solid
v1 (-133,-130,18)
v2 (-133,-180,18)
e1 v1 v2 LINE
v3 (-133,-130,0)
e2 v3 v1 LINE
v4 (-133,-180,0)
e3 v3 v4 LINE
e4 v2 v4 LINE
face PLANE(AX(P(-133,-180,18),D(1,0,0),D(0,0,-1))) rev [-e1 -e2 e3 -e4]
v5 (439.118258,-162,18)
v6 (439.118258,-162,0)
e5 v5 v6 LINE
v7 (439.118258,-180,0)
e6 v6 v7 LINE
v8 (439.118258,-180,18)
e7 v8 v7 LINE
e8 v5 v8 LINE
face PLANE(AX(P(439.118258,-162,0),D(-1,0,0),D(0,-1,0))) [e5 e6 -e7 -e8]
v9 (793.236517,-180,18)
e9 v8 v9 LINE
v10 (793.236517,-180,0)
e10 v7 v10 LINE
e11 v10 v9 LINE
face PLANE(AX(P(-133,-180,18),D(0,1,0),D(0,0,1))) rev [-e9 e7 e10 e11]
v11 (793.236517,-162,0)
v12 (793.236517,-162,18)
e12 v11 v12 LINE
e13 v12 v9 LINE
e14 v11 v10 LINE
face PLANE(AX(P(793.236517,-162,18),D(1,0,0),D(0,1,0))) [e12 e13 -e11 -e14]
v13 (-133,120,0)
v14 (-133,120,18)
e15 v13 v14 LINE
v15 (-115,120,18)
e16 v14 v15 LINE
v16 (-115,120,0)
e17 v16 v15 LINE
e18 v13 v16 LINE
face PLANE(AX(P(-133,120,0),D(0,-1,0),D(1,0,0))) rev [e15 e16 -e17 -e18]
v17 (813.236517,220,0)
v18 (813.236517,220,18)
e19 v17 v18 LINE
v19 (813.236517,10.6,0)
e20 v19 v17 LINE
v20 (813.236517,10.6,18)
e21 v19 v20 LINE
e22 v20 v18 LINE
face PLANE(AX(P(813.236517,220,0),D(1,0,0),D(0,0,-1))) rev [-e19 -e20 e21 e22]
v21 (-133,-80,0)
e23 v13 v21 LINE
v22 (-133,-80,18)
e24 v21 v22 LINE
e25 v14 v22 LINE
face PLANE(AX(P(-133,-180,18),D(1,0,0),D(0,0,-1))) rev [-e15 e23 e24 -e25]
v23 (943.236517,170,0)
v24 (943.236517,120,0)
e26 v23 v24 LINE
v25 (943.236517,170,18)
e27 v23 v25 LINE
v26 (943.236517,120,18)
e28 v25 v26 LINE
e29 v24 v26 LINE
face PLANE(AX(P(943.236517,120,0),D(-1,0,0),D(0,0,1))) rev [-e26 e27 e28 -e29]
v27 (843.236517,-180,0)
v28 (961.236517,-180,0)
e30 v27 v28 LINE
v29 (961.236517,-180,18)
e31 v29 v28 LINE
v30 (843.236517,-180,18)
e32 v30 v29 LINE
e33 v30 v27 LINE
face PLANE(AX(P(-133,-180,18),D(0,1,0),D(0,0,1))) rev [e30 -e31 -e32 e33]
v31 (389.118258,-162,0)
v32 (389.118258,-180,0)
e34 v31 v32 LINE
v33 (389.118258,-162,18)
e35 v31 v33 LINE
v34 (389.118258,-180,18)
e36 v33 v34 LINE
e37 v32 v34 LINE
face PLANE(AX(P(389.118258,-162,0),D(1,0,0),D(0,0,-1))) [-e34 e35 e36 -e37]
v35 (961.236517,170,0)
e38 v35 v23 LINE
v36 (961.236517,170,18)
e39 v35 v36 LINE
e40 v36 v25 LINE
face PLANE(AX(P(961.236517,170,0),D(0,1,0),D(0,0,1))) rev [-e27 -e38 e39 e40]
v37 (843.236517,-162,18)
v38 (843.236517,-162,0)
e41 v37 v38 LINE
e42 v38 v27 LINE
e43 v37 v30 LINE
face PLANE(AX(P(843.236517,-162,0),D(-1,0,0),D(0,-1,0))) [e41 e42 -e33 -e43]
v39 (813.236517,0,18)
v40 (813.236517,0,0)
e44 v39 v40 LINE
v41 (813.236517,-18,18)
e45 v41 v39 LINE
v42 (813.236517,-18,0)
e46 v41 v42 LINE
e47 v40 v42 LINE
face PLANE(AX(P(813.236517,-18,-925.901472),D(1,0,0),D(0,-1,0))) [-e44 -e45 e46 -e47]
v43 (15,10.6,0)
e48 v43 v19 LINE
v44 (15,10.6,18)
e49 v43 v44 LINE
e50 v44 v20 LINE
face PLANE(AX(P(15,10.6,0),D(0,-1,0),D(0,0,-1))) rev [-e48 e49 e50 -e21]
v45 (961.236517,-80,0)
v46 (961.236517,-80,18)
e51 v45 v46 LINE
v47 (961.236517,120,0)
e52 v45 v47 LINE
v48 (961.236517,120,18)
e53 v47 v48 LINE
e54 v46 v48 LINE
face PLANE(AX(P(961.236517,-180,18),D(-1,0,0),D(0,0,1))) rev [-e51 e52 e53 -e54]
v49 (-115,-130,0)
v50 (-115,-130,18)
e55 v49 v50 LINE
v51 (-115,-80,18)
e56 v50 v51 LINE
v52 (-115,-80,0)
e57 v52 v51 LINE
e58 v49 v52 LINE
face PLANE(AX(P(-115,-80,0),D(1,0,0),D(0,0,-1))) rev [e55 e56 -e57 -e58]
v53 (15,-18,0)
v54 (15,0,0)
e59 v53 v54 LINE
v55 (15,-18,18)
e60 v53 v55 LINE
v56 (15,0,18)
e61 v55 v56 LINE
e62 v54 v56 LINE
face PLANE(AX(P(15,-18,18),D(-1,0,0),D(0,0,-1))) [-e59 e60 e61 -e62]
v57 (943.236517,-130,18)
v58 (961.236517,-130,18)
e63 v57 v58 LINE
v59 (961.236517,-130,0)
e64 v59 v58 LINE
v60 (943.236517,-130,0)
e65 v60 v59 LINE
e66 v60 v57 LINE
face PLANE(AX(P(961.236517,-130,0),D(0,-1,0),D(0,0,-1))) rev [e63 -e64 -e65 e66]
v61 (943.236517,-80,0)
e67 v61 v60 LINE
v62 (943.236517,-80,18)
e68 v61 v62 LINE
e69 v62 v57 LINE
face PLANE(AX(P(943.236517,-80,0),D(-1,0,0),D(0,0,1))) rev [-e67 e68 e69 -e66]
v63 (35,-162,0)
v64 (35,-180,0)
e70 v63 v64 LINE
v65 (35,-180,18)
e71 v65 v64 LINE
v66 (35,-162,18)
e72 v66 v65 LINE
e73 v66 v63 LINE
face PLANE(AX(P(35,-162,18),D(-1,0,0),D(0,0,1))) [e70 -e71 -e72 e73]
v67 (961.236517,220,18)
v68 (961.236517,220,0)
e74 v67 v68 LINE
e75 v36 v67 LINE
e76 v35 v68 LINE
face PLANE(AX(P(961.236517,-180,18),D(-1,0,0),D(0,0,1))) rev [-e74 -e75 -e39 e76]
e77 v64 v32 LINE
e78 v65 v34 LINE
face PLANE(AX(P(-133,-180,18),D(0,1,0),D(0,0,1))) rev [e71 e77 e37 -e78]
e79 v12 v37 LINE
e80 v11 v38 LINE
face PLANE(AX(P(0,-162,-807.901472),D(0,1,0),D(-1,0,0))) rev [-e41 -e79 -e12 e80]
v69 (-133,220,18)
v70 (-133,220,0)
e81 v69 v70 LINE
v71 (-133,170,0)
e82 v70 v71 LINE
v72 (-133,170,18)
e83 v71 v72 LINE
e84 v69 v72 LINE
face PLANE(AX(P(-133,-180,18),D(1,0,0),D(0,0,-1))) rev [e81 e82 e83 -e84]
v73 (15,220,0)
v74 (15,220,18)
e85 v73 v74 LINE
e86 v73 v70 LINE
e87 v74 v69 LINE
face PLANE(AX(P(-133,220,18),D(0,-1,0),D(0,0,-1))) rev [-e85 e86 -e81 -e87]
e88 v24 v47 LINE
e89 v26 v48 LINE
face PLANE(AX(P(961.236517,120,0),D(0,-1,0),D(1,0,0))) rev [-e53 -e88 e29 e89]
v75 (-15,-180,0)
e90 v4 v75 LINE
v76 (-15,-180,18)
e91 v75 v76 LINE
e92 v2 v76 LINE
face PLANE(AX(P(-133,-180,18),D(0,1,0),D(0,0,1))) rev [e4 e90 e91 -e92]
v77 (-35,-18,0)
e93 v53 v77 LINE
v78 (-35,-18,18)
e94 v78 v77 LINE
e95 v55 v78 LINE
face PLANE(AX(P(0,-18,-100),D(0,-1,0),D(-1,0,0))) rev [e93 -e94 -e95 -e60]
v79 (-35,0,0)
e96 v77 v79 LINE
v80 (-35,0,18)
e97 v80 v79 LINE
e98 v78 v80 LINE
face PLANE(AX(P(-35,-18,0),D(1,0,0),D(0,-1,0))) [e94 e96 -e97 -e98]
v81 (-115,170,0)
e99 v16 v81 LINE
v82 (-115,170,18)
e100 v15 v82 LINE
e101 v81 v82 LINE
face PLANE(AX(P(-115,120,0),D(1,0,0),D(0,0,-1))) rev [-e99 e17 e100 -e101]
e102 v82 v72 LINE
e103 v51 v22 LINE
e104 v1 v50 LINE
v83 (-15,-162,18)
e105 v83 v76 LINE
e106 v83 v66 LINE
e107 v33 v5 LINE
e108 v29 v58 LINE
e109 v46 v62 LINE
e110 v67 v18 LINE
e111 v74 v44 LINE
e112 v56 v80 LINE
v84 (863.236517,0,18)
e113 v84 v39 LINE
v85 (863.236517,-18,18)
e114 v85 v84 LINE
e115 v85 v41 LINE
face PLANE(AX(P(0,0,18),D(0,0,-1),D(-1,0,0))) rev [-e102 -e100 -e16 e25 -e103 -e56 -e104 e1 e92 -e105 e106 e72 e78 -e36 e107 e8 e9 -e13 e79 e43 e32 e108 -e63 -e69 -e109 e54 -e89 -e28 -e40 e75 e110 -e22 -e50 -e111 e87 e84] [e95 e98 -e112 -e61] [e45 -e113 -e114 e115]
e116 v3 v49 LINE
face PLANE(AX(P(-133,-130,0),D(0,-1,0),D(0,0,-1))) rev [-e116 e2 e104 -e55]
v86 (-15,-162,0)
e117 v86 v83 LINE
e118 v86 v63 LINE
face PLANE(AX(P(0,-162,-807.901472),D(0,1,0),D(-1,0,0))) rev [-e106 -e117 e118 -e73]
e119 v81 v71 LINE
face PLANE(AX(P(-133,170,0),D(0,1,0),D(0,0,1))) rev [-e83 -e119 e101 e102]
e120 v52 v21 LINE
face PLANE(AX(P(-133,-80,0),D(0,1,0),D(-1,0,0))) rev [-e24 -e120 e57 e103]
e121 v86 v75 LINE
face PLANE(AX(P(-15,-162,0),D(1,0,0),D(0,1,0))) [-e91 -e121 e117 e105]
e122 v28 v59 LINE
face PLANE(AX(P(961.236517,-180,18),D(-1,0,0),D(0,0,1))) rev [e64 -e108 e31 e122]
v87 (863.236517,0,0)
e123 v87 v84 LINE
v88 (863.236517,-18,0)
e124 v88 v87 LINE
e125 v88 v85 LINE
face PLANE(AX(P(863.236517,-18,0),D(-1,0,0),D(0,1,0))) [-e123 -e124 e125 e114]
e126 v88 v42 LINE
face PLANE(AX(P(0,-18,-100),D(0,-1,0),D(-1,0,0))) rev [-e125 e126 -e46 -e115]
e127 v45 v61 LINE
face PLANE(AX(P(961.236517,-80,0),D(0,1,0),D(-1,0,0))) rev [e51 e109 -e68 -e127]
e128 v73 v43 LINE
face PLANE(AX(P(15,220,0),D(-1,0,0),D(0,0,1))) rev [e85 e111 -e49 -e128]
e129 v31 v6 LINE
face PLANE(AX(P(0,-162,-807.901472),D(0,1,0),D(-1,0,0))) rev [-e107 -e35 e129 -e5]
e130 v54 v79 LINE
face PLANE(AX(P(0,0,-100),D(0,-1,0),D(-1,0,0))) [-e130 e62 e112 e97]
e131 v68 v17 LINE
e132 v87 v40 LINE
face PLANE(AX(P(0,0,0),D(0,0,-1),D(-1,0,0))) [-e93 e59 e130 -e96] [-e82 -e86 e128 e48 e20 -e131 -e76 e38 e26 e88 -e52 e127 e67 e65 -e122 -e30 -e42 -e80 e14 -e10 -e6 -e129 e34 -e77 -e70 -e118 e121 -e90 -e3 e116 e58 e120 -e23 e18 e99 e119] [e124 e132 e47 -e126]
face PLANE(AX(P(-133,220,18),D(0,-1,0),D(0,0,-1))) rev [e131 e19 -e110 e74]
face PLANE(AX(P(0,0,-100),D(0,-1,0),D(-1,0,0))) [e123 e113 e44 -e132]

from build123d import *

# Parameters (mm, degrees)
SKETCH1_W           = 1094.236516538
SKETCH1_H           = 400
BOSS_EXTRUDE1_DEPTH = 18
CAVITY1_START       = -15
CAVITY1_OUTLINE_W   = 18
CAVITY1_OUTLINE_H   = 18
CAVITY1_DEPTH       = 30
CAVITY1_START_2     = 813.236516538
CAVITY1_2_OUTLINE_W = 18
CAVITY1_2_OUTLINE_H = 18
CAVITY1_2_DEPTH     = 30
CAVITY1_START_3     = 389.118258269
CAVITY1_3_OUTLINE_W = 18
CAVITY1_3_OUTLINE_H = 18
CAVITY1_3_DEPTH     = 50
CAVITY1_START_4     = -35
CAVITY1_4_OUTLINE_W = 18
CAVITY1_4_OUTLINE_H = 18
CAVITY1_4_DEPTH     = 20
CAVITY1_START_5     = 15
CAVITY1_5_OUTLINE_W = 18
CAVITY1_5_OUTLINE_H = 18
CAVITY1_5_DEPTH     = 20
CAVITY1_START_6     = 793.236516538
CAVITY1_6_OUTLINE_W = 18
CAVITY1_6_OUTLINE_H = 18
CAVITY1_6_DEPTH     = 20
CAVITY1_START_7     = 843.236516538
CAVITY1_7_OUTLINE_W = 18
CAVITY1_7_OUTLINE_H = 18
CAVITY1_7_DEPTH     = 20
SKETCH2_W           = 18
SKETCH2_H           = 50
CUT_EXTRUDE1_DEPTH  = 987.255362837
SKETCH3_W           = 798.236516538
SKETCH3_H           = 209.4
CUT_EXTRUDE2_DEPTH  = 18


# Read off the part's stored shape, not the designer's step: Cavity1
with BuildPart() as part:
    # Sketch1 → Boss-Extrude1 (new body)
    with BuildSketch(Plane.XY):
        with Locations((414.118258269, 20)):
            Rectangle(SKETCH1_W, SKETCH1_H)
    extrude(amount=BOSS_EXTRUDE1_DEPTH)

    # Cavity1 outline → Cavity1 (cut)
    with BuildSketch(Plane.YZ.offset(CAVITY1_START)):
        with Locations((-9, 9)):
            Rectangle(CAVITY1_OUTLINE_W, CAVITY1_OUTLINE_H)
        with Locations((-171, 9)):
            Rectangle(CAVITY1_OUTLINE_W, CAVITY1_OUTLINE_H)
    extrude(amount=CAVITY1_DEPTH, mode=Mode.SUBTRACT)

    # Cavity1 2 outline → Cavity1 2 (cut)
    with BuildSketch(Plane.YZ.offset(CAVITY1_START_2)):
        with Locations((-9, 9)):
            Rectangle(CAVITY1_2_OUTLINE_W, CAVITY1_2_OUTLINE_H)
        with Locations((-171, 9)):
            Rectangle(CAVITY1_2_OUTLINE_W, CAVITY1_2_OUTLINE_H)
    extrude(amount=CAVITY1_2_DEPTH, mode=Mode.SUBTRACT)

    # Cavity1 3 outline → Cavity1 3 (cut)
    with BuildSketch(Plane.YZ.offset(CAVITY1_START_3)):
        with Locations((-171, 9)):
            Rectangle(CAVITY1_3_OUTLINE_W, CAVITY1_3_OUTLINE_H)
    extrude(amount=CAVITY1_3_DEPTH, mode=Mode.SUBTRACT)

    # Cavity1 4 outline → Cavity1 4 (cut)
    with BuildSketch(Plane.YZ.offset(CAVITY1_START_4)):
        with Locations((-9, 9)):
            Rectangle(CAVITY1_4_OUTLINE_W, CAVITY1_4_OUTLINE_H)
    extrude(amount=CAVITY1_4_DEPTH, mode=Mode.SUBTRACT)

    # Cavity1 5 outline → Cavity1 5 (cut)
    with BuildSketch(Plane.YZ.offset(CAVITY1_START_5)):
        with Locations((-171, 9)):
            Rectangle(CAVITY1_5_OUTLINE_W, CAVITY1_5_OUTLINE_H)
    extrude(amount=CAVITY1_5_DEPTH, mode=Mode.SUBTRACT)

    # Cavity1 6 outline → Cavity1 6 (cut)
    with BuildSketch(Plane.YZ.offset(CAVITY1_START_6)):
        with Locations((-171, 9)):
            Rectangle(CAVITY1_6_OUTLINE_W, CAVITY1_6_OUTLINE_H)
    extrude(amount=CAVITY1_6_DEPTH, mode=Mode.SUBTRACT)

    # Cavity1 7 outline → Cavity1 7 (cut)
    with BuildSketch(Plane.YZ.offset(CAVITY1_START_7)):
        with Locations((-9, 9)):
            Rectangle(CAVITY1_7_OUTLINE_W, CAVITY1_7_OUTLINE_H)
    extrude(amount=CAVITY1_7_DEPTH, mode=Mode.SUBTRACT)

    # Sketch2 → Cut-Extrude1 (cut, through all)
    with BuildSketch(Plane.XY.offset(18)):
        with Locations((952.236516538, 145)):
            Rectangle(SKETCH2_W, SKETCH2_H)
        with Locations((952.236516538, -105)):
            Rectangle(SKETCH2_W, SKETCH2_H)
        with Locations((-124, -105)):
            Rectangle(SKETCH2_W, SKETCH2_H)
        with Locations((-124, 145)):
            Rectangle(SKETCH2_W, SKETCH2_H)
    extrude(amount=-CUT_EXTRUDE1_DEPTH, mode=Mode.SUBTRACT)

    # Sketch3 → Cut-Extrude2 (cut)
    with BuildSketch(Plane.XY.offset(18)):
        with Locations((414.118258269, 115.3)):
            Rectangle(SKETCH3_W, SKETCH3_H)
    extrude(amount=-CUT_EXTRUDE2_DEPTH, mode=Mode.SUBTRACT)


solid = part.part
